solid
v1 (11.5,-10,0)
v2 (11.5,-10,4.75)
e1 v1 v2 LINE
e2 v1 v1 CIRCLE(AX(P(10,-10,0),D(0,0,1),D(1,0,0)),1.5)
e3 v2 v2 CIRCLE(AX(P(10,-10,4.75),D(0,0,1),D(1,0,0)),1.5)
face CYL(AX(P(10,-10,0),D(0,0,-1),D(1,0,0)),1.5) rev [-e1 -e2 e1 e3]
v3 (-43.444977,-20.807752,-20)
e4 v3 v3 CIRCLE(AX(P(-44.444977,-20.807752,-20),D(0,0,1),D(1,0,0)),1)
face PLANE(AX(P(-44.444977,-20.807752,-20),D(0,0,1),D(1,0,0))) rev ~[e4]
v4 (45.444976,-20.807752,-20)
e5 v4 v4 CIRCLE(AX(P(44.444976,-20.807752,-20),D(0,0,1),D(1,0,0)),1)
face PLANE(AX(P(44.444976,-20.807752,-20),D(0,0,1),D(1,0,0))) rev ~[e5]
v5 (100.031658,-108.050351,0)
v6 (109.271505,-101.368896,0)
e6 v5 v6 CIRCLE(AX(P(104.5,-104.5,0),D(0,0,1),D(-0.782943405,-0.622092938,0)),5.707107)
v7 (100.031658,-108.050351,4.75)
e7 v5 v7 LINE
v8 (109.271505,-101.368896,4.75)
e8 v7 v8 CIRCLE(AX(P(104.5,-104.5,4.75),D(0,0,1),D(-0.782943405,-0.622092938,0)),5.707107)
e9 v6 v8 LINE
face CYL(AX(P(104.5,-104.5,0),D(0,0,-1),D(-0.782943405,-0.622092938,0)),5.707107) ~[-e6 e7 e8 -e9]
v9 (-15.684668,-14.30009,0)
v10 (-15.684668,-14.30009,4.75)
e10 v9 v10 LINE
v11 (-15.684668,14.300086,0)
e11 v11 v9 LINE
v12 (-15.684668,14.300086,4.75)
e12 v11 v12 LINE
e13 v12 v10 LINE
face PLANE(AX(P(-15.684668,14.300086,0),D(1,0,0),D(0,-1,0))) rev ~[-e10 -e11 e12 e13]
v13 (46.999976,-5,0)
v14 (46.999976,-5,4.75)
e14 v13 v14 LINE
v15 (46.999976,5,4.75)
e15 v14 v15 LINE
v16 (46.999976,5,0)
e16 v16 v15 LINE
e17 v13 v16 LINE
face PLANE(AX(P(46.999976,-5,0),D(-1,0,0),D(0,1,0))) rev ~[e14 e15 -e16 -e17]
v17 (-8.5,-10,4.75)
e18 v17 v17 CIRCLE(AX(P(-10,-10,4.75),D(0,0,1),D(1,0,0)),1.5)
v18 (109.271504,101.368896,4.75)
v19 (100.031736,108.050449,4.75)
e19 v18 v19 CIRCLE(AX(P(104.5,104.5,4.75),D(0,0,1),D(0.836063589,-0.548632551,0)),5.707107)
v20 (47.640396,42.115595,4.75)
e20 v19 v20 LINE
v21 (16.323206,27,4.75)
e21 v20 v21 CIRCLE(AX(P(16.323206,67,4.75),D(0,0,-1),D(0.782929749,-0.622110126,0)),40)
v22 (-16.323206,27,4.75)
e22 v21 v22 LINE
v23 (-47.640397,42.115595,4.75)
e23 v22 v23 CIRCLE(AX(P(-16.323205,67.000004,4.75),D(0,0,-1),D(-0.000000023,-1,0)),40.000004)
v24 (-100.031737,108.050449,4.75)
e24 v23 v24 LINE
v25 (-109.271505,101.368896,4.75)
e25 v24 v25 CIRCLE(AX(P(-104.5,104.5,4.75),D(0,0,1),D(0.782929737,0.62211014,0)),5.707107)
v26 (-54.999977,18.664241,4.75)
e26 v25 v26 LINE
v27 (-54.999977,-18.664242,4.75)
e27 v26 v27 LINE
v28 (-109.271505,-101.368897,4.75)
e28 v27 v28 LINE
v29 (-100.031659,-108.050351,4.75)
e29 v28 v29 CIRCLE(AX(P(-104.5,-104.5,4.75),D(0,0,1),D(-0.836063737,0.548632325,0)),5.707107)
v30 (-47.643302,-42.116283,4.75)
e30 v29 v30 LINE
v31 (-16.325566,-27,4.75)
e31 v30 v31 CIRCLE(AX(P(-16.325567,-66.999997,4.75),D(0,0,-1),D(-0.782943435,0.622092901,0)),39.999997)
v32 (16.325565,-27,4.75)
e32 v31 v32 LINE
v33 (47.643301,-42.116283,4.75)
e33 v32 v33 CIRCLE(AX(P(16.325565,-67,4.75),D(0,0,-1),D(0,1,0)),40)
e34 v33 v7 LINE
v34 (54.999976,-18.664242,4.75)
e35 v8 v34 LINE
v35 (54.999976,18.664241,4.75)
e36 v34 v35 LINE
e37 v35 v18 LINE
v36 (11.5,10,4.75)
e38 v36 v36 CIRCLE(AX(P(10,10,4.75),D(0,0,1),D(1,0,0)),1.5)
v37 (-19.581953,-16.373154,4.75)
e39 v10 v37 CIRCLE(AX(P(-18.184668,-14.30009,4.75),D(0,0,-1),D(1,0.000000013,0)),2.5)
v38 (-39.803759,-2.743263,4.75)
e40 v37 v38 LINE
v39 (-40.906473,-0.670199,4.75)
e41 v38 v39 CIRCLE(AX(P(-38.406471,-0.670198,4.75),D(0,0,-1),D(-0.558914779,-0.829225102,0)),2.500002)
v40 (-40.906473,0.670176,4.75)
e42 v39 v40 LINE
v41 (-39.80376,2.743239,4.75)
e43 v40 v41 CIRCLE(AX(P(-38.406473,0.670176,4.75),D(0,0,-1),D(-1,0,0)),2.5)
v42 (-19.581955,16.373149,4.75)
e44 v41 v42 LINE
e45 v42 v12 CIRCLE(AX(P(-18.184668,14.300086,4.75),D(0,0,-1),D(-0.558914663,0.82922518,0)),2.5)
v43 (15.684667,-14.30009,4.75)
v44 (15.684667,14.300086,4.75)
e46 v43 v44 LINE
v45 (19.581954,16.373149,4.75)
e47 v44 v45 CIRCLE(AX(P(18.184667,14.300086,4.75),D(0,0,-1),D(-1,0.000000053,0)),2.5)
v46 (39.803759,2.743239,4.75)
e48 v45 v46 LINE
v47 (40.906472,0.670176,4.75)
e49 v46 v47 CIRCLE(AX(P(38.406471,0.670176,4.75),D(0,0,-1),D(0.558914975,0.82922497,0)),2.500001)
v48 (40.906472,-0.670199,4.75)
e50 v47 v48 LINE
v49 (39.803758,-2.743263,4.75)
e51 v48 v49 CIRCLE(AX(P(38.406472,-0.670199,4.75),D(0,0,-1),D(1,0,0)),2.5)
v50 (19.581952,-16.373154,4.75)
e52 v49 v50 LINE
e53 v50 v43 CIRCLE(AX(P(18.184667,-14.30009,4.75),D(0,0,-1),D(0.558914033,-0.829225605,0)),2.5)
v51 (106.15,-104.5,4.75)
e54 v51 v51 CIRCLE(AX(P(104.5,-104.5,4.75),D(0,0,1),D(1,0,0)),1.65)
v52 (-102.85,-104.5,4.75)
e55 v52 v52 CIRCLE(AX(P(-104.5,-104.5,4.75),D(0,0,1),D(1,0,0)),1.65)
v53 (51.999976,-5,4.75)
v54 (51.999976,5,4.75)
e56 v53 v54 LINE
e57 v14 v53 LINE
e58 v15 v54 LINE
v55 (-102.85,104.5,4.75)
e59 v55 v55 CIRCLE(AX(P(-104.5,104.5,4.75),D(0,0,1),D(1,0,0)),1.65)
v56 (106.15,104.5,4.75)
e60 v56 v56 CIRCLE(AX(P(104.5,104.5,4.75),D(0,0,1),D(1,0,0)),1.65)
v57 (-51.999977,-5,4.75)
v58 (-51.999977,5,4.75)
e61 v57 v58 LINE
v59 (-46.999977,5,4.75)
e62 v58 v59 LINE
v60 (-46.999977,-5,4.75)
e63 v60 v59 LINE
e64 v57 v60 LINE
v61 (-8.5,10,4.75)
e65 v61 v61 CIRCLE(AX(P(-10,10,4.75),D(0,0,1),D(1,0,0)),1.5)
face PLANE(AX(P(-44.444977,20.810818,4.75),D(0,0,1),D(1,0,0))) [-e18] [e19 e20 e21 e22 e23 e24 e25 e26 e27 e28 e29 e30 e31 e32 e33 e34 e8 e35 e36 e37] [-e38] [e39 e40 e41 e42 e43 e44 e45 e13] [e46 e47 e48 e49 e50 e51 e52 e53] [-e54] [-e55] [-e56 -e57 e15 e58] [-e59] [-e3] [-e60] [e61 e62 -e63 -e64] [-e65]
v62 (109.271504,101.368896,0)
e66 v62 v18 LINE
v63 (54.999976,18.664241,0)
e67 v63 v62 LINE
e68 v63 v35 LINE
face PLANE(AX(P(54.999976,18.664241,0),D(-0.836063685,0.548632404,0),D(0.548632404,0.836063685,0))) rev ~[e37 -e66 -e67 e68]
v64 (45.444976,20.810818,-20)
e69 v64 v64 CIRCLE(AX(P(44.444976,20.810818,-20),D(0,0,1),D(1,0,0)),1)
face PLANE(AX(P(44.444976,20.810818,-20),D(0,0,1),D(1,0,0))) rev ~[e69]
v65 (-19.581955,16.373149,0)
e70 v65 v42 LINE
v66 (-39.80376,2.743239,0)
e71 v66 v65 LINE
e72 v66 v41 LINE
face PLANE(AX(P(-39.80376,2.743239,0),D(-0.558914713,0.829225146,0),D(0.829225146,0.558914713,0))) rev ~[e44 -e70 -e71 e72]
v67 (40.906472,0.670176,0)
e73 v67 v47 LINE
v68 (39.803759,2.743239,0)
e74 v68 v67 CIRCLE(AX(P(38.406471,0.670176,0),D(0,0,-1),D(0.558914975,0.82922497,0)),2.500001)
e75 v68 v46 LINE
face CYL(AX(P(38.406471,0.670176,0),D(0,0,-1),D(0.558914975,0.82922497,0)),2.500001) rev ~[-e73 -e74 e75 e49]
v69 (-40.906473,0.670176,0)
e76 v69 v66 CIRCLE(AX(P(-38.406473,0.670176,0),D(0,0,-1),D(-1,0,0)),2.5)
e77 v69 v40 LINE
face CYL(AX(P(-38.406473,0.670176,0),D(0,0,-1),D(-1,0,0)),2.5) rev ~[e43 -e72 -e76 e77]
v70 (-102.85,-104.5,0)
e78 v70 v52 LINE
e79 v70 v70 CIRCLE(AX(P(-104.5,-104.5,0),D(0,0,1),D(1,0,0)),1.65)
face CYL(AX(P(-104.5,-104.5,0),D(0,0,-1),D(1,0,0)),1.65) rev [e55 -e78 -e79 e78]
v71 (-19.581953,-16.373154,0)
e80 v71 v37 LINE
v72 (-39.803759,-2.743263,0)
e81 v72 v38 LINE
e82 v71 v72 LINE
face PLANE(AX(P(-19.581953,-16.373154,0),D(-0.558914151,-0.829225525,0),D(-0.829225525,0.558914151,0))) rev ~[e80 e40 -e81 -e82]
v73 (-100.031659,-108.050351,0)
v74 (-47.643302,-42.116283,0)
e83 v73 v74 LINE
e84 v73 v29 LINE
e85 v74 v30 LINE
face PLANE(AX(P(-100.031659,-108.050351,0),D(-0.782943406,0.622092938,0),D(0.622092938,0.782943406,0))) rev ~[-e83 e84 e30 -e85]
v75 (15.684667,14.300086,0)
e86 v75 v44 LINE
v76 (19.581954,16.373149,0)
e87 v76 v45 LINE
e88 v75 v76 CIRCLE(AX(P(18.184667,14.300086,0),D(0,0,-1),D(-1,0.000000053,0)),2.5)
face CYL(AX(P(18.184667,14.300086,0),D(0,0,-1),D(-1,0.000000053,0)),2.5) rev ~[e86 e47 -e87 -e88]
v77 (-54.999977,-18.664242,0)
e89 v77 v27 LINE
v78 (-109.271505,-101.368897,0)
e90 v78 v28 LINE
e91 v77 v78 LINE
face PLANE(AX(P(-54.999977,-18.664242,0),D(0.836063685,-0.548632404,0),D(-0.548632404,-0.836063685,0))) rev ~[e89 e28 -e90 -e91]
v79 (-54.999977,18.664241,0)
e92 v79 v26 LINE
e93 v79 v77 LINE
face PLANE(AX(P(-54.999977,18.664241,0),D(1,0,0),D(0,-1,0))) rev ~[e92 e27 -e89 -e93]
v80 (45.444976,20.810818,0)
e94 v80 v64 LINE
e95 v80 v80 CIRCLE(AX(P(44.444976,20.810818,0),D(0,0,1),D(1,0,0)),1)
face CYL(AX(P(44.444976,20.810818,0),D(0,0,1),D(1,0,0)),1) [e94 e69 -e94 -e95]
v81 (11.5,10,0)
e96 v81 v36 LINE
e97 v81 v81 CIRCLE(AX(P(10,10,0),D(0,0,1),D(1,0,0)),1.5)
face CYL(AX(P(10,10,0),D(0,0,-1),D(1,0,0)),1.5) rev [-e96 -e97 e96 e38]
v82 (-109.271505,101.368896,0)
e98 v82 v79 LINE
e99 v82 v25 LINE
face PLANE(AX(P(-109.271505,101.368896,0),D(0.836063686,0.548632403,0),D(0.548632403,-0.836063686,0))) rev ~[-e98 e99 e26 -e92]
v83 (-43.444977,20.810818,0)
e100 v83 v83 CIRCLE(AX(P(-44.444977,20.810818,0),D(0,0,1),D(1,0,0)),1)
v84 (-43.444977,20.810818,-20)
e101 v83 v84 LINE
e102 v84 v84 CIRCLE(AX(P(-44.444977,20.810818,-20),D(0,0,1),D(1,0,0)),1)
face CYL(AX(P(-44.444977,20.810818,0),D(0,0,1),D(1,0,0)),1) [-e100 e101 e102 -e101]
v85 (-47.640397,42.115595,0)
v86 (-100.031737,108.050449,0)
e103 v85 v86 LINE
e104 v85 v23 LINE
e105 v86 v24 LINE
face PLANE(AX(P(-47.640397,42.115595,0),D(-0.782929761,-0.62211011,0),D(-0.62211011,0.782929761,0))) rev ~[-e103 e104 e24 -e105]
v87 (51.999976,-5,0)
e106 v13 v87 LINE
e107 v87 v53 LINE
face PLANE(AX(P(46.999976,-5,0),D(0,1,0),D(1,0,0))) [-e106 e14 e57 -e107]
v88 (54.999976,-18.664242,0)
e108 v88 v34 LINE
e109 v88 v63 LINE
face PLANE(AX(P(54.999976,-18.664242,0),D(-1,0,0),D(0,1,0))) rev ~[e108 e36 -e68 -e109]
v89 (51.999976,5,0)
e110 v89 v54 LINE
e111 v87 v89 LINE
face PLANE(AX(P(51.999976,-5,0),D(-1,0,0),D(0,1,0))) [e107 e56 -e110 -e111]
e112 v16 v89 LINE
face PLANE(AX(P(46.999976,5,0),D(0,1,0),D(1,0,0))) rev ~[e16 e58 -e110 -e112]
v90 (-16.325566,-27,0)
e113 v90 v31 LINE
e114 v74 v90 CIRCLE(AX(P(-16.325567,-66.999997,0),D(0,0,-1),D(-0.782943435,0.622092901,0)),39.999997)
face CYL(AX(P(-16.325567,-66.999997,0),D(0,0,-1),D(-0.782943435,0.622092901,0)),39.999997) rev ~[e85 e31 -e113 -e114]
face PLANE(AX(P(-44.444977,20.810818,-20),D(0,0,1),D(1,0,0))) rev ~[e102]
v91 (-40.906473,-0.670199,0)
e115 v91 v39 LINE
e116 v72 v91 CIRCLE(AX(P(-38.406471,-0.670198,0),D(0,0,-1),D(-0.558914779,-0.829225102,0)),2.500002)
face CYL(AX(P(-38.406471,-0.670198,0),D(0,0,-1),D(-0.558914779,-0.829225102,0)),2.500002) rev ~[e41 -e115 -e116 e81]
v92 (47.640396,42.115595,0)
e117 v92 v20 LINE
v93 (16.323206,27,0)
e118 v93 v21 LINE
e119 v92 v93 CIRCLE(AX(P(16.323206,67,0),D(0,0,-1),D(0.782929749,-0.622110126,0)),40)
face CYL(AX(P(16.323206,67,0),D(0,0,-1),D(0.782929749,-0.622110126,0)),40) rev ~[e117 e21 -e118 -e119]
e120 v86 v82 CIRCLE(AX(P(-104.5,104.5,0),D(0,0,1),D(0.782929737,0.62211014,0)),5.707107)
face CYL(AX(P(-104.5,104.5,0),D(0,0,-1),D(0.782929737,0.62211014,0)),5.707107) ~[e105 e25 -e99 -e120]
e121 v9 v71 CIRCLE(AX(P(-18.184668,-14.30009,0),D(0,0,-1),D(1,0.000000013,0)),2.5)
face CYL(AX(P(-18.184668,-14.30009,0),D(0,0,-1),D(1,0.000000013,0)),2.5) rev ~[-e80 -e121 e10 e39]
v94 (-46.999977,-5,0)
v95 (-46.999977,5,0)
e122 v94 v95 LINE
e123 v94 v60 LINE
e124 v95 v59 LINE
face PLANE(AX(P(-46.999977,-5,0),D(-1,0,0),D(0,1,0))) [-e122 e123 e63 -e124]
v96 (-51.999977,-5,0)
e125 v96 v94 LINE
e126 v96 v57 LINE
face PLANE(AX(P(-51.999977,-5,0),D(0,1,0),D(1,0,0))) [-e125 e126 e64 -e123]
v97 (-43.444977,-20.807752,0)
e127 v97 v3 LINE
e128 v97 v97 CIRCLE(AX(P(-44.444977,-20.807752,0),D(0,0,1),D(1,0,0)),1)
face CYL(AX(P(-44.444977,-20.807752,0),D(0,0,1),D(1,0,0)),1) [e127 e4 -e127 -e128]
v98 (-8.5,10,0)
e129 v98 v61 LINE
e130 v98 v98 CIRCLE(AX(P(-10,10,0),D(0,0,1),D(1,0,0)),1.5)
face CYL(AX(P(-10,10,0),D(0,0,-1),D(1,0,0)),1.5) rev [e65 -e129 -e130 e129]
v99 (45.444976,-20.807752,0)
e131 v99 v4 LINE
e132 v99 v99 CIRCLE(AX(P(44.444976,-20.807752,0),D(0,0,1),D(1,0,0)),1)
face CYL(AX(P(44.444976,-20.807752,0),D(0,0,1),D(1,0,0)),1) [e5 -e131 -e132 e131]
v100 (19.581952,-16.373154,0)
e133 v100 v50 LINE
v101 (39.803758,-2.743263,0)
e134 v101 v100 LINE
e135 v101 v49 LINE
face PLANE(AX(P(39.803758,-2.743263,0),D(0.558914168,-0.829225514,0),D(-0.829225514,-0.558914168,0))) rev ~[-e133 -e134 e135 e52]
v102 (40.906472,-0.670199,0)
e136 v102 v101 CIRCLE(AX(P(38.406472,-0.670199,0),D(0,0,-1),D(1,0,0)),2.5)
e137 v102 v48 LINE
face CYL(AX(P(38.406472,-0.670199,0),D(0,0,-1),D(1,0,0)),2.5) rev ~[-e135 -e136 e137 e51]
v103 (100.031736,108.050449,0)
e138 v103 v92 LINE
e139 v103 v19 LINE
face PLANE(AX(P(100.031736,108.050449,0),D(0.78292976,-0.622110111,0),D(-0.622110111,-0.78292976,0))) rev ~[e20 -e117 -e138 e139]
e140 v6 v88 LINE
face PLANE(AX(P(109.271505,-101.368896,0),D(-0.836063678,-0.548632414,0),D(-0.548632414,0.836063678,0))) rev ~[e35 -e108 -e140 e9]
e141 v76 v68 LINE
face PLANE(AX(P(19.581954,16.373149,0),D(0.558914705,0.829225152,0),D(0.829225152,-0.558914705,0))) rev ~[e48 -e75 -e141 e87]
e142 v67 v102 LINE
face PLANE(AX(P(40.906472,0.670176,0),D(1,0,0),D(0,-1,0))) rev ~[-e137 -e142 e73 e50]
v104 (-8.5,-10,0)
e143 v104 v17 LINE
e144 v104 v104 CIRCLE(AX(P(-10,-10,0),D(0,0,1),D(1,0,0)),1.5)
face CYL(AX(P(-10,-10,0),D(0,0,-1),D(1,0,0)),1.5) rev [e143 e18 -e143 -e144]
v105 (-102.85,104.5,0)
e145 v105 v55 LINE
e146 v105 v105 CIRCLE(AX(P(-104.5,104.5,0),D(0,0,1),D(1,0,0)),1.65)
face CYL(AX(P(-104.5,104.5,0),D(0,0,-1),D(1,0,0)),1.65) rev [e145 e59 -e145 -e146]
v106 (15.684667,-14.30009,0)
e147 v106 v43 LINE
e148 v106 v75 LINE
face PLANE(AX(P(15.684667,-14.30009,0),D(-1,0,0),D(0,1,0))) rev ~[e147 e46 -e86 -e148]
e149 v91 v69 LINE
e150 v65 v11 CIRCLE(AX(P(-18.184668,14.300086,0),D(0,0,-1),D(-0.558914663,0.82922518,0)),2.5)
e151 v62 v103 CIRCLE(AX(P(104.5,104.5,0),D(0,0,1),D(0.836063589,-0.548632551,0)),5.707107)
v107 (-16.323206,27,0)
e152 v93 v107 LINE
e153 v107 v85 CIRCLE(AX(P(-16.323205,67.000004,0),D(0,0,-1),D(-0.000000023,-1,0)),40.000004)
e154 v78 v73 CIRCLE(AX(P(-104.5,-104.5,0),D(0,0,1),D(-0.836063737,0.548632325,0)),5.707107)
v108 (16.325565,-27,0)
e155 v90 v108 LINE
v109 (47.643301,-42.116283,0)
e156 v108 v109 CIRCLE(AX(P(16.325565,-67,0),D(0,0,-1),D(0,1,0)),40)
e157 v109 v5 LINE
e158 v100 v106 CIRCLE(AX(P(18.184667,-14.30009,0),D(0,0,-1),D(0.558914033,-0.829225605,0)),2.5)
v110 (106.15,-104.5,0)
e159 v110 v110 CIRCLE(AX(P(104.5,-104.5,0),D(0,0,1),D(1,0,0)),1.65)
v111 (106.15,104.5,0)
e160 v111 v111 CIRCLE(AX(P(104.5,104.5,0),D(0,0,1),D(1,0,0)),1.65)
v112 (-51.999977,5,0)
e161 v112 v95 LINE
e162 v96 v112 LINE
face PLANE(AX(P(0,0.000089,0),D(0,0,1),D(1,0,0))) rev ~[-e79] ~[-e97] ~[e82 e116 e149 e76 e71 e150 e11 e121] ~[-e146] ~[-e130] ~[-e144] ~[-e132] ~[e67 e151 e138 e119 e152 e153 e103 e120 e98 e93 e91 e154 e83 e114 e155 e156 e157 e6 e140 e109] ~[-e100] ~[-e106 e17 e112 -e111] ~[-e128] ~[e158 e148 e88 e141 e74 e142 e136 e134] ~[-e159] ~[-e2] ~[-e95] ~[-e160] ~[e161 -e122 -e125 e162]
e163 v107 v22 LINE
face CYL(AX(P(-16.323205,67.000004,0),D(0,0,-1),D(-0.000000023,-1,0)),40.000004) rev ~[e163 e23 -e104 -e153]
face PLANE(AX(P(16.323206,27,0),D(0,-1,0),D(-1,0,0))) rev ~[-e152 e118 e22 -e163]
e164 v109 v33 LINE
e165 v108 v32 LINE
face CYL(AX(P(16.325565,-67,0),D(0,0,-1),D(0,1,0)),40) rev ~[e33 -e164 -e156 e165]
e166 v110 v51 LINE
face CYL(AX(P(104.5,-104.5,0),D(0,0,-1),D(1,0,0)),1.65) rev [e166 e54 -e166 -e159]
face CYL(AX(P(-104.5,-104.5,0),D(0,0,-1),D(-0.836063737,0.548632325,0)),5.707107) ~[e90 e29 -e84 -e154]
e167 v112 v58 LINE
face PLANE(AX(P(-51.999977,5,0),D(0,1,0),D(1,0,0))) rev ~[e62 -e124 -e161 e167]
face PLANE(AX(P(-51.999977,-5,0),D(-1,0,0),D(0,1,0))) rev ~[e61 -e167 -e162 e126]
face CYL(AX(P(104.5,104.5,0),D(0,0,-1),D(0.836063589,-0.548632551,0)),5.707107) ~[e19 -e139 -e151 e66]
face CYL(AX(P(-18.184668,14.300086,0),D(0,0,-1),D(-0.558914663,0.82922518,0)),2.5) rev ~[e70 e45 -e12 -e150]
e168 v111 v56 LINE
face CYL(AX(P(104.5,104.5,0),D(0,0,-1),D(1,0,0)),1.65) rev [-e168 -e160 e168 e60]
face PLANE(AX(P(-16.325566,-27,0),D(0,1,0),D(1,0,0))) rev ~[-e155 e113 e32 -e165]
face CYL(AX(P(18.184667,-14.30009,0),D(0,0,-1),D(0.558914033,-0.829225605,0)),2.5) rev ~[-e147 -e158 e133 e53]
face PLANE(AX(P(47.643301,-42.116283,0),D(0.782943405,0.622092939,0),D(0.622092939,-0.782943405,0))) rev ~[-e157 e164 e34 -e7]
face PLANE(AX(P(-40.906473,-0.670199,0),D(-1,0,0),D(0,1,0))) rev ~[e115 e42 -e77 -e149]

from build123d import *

# Parameters (mm, degrees)
F0_R     = 1.65
F0_R_2   = 2.55
F0_W     = 5
F0_H     = 10
F0_R_3   = 1.5
F0_R_4   = 3.555
F1_DEPTH = 4.75
F2_R     = 1
F3_DEPTH = 20
F4_R     = 3.555
F4_R_2   = 2.55
F5_DEPTH = 4.75


# Not quite as in the source:
# - ends of sketch curves that miss each other by under 0.0002 mm in the source are joined


with BuildPart() as f1:
    # F0 (on Top) → F1 (new body)
    with BuildSketch(Plane.XY):
        with BuildLine():
            Line((-47.640397, 42.115595), (-100.031737, 108.050449))
            ThreePointArc((-100.031737, 108.050449), (-107.8442155419, 109.1246397394), (-109.2715048598, 101.368896092))
            Line((-109.2715048598, 101.368896092), (-54.999977, 18.664241))
            Line((-54.999977, 18.664241), (-54.999977, -18.664242))
            Line((-54.999977, -18.664242), (-109.271505, -101.368897))
            ThreePointArc((-109.271505, -101.368897), (-107.8441644553, -109.1246766812), (-100.031658534, -108.0503513703))
            Line((-100.031658534, -108.0503513703), (-47.643302, -42.116283))
            ThreePointArc((-47.643302, -42.116283), (-33.7130803066, -30.9767526972), (-16.325566, -27))
            Line((-16.325566, -27), (16.325565, -27))
            ThreePointArc((16.325565, -27), (33.7130793066, -30.9767526972), (47.6433013924, -42.1162826882))
            Line((47.6433013924, -42.1162826882), (100.031658, -108.050351))
            ThreePointArc((100.031658, -108.050351), (107.8441644255, -109.1246767027), (109.2715050175, -101.3688963323))
            Line((109.2715050175, -101.3688963323), (54.999976, -18.664242))
            Line((54.999976, -18.664242), (54.999976, 18.664241))
            Line((54.999976, 18.664241), (109.271504, 101.368896))
            ThreePointArc((109.271504, 101.368896), (107.8442155121, 109.1246397609), (100.0317360662, 108.0504489474))
            Line((100.0317360662, 108.0504489474), (47.640396, 42.115595))
            ThreePointArc((47.640396, 42.115595), (33.7103248028, 30.9765618002), (16.323206, 27))
            Line((16.323206, 27), (-16.323206, 27))
            ThreePointArc((-16.323206, 27), (-33.710325083, 30.9765619354), (-47.640397, 42.115595))
        make_face()
        with Locations((-104.5, -104.5)):
            Circle(F0_R, mode=Mode.SUBTRACT)
        with Locations((-44.444977, -20.807752)):
            Circle(F0_R_2, mode=Mode.SUBTRACT)
        with Locations((-49.499977, 0)):
            Rectangle(F0_W, F0_H, mode=Mode.SUBTRACT)
        with BuildLine():
            Line((-19.581953, -16.373154), (-39.803759, -2.743263))
            ThreePointArc((-39.803759, -2.743263), (-40.6136447533, -1.8442487652), (-40.906473, -0.670199))
            Line((-40.906473, -0.670199), (-40.906473, 0.670176))
            ThreePointArc((-40.906473, 0.670176), (-40.6136450793, 1.8442251525), (-39.8037598701, 2.7432388072))
            Line((-39.8037598701, 2.7432388072), (-19.581955, 16.373149))
            ThreePointArc((-19.581955, 16.373149), (-17.0106188475, 16.5072580793), (-15.684668, 14.300086))
            Line((-15.684668, 14.300086), (-15.684668, -14.30009))
            ThreePointArc((-15.684668, -14.30009), (-17.0106178687, -16.5072615586), (-19.581953, -16.373154))
        make_face(mode=Mode.SUBTRACT)
        with Locations((-10, -10)):
            Circle(F0_R_3, mode=Mode.SUBTRACT)
        with Locations((104.5, -104.5)):
            Circle(F0_R, mode=Mode.SUBTRACT)
        with Locations((10, -10)):
            Circle(F0_R_3, mode=Mode.SUBTRACT)
        with Locations((44.444976, -20.807752)):
            Circle(F0_R_2, mode=Mode.SUBTRACT)
        with BuildLine():
            Line((19.581954, 16.373149), (39.803759, 2.743239))
            ThreePointArc((39.803759, 2.743239), (40.6136440793, 1.8442251525), (40.906472, 0.670176))
            Line((40.906472, 0.670176), (40.906472, -0.670199))
            ThreePointArc((40.906472, -0.670199), (40.6136437533, -1.8442487652), (39.803757719, -2.7432625831))
            Line((39.803757719, -2.7432625831), (19.581952, -16.373154))
            ThreePointArc((19.581952, -16.373154), (17.0106168687, -16.5072615586), (15.684667, -14.30009))
            Line((15.684667, -14.30009), (15.684667, 14.300086))
            ThreePointArc((15.684667, 14.300086), (17.0106178475, 16.5072580793), (19.581954, 16.373149))
        make_face(mode=Mode.SUBTRACT)
        with Locations((49.499976, 0)):
            Rectangle(F0_W, F0_H, mode=Mode.SUBTRACT)
        with Locations((-44.444977, 20.810818)):
            Circle(F0_R_4, mode=Mode.SUBTRACT)
        with Locations((-10, 10)):
            Circle(F0_R_3, mode=Mode.SUBTRACT)
        with Locations((-104.5, 104.5)):
            Circle(F0_R, mode=Mode.SUBTRACT)
        with Locations((10, 10)):
            Circle(F0_R_3, mode=Mode.SUBTRACT)
        with Locations((44.444976, 20.810818)):
            Circle(F0_R_4, mode=Mode.SUBTRACT)
        with Locations((104.5, 104.5)):
            Circle(F0_R, mode=Mode.SUBTRACT)
    extrude(amount=F1_DEPTH)



with BuildPart() as f3:
    # F2 (on Top) → F3 (new body)
    with BuildSketch(Plane.XY):
        with Locations((-44.444977, 20.810818)):
            Circle(F2_R)
    extrude(amount=-F3_DEPTH)


with BuildPart() as f3b:
    # F2 (on Top) → F3, piece 2 (new body)
    with BuildSketch(Plane.XY):
        with Locations((44.444976, 20.810818)):
            Circle(F2_R)
    extrude(amount=-F3_DEPTH)


with BuildPart() as f3c:
    # F2 (on Top) → F3, piece 3 (new body)
    with BuildSketch(Plane.XY):
        with Locations((-44.444977, -20.807752)):
            Circle(F2_R)
    extrude(amount=-F3_DEPTH)


with BuildPart() as f3d:
    # F2 (on Top) → F3, piece 4 (new body)
    with BuildSketch(Plane.XY):
        with Locations((44.444976, -20.807752)):
            Circle(F2_R)
    extrude(amount=-F3_DEPTH)


with BuildPart() as f1_1:
    add(f1.part)

    add(f3.part)  # F5 merges F3

    add(f3b.part)  # F5 merges F3b

    add(f3c.part)  # F5 merges F3c

    add(f3d.part)  # F5 merges F3d
    # F4 (on face) → F5 (join)
    with BuildSketch(Plane.XY.offset(4.75)):
        with Locations((-44.444977, 20.810818)):
            Circle(F4_R)
        with Locations((-44.444977, -20.807752)):
            Circle(F4_R_2)
        with Locations((44.444976, 20.810818)):
            Circle(F4_R)
        with Locations((44.444976, -20.807752)):
            Circle(F4_R_2)
    extrude(amount=-F5_DEPTH)


solid = f1_1.part
